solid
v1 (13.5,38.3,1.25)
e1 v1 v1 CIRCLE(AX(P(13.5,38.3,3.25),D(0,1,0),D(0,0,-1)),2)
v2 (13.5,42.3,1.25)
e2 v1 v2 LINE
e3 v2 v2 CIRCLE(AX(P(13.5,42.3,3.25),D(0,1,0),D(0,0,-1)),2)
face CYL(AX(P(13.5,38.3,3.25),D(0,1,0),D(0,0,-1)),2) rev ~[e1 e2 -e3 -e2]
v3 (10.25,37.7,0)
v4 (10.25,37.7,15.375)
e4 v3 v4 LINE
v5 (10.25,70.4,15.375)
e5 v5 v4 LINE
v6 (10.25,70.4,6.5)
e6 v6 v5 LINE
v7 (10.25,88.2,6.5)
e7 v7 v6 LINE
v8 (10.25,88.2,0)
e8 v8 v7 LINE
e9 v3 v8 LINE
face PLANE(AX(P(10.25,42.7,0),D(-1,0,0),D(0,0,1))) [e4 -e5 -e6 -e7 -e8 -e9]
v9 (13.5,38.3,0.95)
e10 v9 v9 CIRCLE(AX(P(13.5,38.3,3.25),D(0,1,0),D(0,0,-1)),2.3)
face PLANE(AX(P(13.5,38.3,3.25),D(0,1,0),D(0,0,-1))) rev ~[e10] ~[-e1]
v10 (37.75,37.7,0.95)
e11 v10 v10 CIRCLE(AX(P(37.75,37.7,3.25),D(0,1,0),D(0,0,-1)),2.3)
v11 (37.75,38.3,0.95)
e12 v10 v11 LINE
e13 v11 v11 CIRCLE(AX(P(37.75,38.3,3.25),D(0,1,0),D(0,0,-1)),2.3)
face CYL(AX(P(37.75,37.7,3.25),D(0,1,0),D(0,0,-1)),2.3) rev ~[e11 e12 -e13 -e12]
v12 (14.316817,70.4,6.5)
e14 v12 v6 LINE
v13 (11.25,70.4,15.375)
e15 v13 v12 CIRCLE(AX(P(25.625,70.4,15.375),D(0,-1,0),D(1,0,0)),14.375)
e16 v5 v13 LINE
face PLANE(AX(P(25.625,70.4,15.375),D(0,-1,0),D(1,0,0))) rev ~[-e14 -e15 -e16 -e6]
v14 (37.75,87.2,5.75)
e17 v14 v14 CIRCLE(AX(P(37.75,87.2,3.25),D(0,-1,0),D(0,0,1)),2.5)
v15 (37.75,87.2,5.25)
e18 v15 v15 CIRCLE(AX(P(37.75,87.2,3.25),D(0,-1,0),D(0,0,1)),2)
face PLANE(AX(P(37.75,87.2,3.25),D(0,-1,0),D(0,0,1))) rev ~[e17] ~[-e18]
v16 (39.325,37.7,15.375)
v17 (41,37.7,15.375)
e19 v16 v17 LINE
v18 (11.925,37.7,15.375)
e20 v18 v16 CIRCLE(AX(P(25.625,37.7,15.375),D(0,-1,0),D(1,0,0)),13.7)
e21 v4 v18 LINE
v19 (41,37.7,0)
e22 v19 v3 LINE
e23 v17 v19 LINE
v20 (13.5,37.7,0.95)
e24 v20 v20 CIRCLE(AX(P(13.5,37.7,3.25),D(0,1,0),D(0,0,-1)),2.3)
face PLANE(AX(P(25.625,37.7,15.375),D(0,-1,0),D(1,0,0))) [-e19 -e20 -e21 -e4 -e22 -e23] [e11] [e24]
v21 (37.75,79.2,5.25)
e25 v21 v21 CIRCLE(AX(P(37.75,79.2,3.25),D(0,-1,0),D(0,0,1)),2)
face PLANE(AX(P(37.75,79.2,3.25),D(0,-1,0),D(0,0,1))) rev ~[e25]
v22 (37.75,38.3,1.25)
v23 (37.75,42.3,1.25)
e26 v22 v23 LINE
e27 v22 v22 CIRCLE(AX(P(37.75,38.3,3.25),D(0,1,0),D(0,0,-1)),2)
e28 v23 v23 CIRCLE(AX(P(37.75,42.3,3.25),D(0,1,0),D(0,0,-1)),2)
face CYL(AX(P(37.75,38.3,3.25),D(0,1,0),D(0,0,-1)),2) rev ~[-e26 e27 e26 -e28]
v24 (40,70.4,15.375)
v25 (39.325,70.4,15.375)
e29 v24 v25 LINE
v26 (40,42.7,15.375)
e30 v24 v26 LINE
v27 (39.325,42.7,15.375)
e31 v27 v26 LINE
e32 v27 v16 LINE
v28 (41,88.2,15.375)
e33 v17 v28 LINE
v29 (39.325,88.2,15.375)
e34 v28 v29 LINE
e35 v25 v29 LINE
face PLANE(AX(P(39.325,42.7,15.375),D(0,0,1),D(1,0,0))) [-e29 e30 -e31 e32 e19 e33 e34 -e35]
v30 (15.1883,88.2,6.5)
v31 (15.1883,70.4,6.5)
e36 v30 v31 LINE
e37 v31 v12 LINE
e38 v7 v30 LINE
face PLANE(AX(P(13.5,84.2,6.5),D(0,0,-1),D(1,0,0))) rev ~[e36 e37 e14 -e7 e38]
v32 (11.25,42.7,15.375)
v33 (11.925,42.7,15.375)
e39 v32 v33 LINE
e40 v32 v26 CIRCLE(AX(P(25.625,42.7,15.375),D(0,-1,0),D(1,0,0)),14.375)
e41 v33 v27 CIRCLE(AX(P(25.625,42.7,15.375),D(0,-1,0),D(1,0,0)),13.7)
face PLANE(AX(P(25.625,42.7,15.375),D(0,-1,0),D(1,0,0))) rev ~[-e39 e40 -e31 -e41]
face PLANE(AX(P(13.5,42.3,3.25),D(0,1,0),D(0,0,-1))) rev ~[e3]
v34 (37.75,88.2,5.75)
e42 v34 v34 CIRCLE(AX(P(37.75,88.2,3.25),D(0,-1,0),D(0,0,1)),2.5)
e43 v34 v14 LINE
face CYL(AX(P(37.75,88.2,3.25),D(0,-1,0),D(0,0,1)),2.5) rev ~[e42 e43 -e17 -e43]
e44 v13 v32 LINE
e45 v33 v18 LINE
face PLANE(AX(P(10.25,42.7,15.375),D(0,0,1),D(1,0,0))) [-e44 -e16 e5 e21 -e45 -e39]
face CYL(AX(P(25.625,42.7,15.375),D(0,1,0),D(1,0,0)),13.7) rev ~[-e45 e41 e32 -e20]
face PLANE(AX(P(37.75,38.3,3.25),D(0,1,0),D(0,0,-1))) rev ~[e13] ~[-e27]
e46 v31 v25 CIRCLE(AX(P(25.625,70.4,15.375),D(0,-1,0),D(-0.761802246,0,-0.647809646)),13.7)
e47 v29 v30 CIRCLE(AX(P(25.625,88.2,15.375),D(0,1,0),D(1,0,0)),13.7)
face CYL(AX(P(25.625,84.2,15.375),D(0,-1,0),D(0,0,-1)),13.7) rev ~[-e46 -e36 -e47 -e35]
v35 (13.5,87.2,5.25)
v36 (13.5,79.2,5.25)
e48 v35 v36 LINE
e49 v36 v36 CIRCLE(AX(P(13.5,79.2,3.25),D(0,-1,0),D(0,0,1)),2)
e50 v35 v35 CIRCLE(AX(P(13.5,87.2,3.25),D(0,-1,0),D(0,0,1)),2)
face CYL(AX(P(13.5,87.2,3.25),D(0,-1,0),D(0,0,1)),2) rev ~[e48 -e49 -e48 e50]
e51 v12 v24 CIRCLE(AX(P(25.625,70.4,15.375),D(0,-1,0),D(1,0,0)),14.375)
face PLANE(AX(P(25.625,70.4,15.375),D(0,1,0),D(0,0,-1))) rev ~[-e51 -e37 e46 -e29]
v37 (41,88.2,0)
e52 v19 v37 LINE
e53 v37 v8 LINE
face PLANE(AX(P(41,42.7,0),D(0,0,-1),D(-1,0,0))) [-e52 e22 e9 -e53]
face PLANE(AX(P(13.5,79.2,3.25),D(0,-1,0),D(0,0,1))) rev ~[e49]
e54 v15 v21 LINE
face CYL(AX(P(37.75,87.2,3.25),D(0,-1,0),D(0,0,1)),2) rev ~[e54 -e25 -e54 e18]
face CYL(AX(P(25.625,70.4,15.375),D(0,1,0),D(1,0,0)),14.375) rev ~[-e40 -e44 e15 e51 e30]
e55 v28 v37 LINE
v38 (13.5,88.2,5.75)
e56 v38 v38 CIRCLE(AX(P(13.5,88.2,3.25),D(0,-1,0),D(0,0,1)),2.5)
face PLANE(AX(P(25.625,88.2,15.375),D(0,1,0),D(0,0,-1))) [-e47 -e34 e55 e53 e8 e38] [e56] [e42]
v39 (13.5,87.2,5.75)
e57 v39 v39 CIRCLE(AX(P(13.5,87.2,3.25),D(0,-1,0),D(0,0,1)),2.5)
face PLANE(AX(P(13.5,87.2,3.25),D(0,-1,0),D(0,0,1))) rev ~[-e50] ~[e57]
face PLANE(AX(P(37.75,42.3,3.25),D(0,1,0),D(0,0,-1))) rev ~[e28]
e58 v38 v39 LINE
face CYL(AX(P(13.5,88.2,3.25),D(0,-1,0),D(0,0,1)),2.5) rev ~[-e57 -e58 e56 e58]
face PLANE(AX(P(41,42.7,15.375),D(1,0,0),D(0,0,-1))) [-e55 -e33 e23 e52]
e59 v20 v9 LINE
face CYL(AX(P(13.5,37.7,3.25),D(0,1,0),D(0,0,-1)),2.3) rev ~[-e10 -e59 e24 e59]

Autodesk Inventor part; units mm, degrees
ref_plane "Work Plane1" through (25.625, 84.2, 15.375) normal (0, 1, 0) x (0, 0, -1)
sketch "Sketch1" plane through (25.625, 84.2, 15.375) normal (0, 1, 0) x (0, 0, -1)
  line L0 (11.5, -1.5) -> (11, -1.5) projected
  line L1 (11, -1.5) -> (11, 1.5) projected
  line L2 (11, 1.5) -> (11.5, 1.5) projected
  line L3 (11.5, 1.5) -> (11.5, -1.5) projected
  line L4 (-12, -1.5) -> (-12, 1.5) projected
  line L5 (-12, 1.5) -> (-11.5, 1.5) projected
  line L6 (-11.5, 1.5) -> (-11.5, -1.5) projected
  line L7 (-11.5, -1.5) -> (-12, -1.5) projected
  circle A0 centre (0, 0) radius 5 projected
  circle A1 centre (0, 0) radius 13.7 projected
  line L8 (18.875, -15.375) -> (18.875, 116.625) projected
  line L9 (18.875, 116.625) -> (15.375, 116.625) projected
  line L10 (15.375, -15.375) -> (15.375, 116.625) projected
  line L11 (18.875, -15.375) -> (15.375, -15.375) projected
  line L12 (15.375, -15.375) -> (0, -15.375)
  line L13 (0, -15.375) -> (0, 15.375)
  line L14 (0, 15.375) -> (15.375, 15.375)
  line L15 (15.375, 15.375) -> (15.375, -15.375)
  circle A2 centre (12.125, 12.125) radius 3.25
  circle A3 centre (12.125, -12.125) radius 3.25
  line L16 (8.875, 15.375) -> (8.875, 10.4367)
  point P0 (15.375, 25.625)
  point P1 (0, -13.7)
  dimension "d2" = 15.375
  dimension "d3" = 15.375
  dimension "d4" = 6.5
  dimension "d5" = 6.5
ref_plane "Work Plane2" through (11.25, 70.4, 1) normal (0, 1, 0) x (0, 0, 1)
extrude "Extrusion1" add sketch "Sketch1" along normal blind 4 and the other way blind 13.8 contours A1 L16 A2 L10 A3 L12 L13 | L16 L14 A2 | A2 | A3 L10 L12 | A3 | L14 L10 A2
sketch "Sketch2" plane through (25.625, 70.4, 15.375) normal (0, -1, 0) x (1, 0, 0)
  arc A0 (-3.651, 5.9062) -> (-4.7619, 7.7035) centre (-4.2064, 6.8048) ccw projected
  arc A1 (-3.651, 5.9062) -> (-6.4477, 2.5768) centre (0, 0) ccw projected
  arc A2 (-8.4097, 3.3608) -> (-6.4477, 2.5768) centre (-7.4287, 2.9688) ccw projected
  arc A3 (-4.7619, 7.7035) -> (-8.4097, 3.3608) centre (0, 0) ccw projected
  arc A4 (6.4477, 2.5768) -> (8.4097, 3.3608) centre (7.4287, 2.9688) ccw projected
  arc A5 (6.4477, 2.5768) -> (3.651, 5.9062) centre (0, 0) ccw projected
  arc A6 (4.7619, 7.7035) -> (3.651, 5.9062) centre (4.2064, 6.8048) ccw projected
  arc A7 (8.4097, 3.3608) -> (4.7619, 7.7035) centre (0, 0) ccw projected
  arc A8 (-6.4563, -2.5553) -> (-8.4209, -3.3328) centre (-7.4386, -2.9441) ccw projected
  arc A9 (-6.4563, -2.5553) -> (-3.651, -5.9062) centre (0, 0) ccw projected
  arc A10 (-4.7619, -7.7035) -> (-3.651, -5.9062) centre (-4.2064, -6.8048) ccw projected
  arc A11 (-8.4209, -3.3328) -> (-4.7619, -7.7035) centre (0, 0) ccw projected
  arc A12 (3.651, -5.9062) -> (4.7619, -7.7035) centre (4.2064, -6.8048) ccw projected
  arc A13 (3.651, -5.9062) -> (6.4563, -2.5553) centre (0, 0) ccw projected
  arc A14 (8.4209, -3.3328) -> (6.4563, -2.5553) centre (7.4386, -2.9441) ccw projected
  arc A15 (4.7619, -7.7035) -> (8.4209, -3.3328) centre (0, 0) ccw projected
  circle A16 centre (10.65, 0.0124) radius 1.15 projected
  circle A17 centre (0, 8) radius 1.0564 projected
  circle A18 centre (0, -8) radius 1.0564 projected
  circle A19 centre (0, 0) radius 5 projected
  circle A20 centre (0, 0) radius 13.7 projected
  line L0 (15.375, -18.875) -> (-116.625, -18.875) projected
  line L1 (-116.625, -18.875) -> (-116.625, -15.375) projected
  line L2 (15.375, -15.375) -> (-116.625, -15.375) projected
  line L3 (15.375, -18.875) -> (15.375, -15.375) projected
  line L4 (15.375, -15.375) -> (-15.375, -15.375)
  line L5 (-15.375, -15.375) -> (-15.375, 0)
  line L6 (-15.375, 0) -> (15.375, 0)
  line L7 (15.375, 0) -> (15.375, -15.375)
  circle A21 centre (0, 0) radius 14.375
  point P0 (-25.625, -15.375)
  point P1 (13.7, 0)
  point P2 (-13.7, 0)
  point P3 (-15.375, -15.375)
  point P4 (14.375, 0)
  point P5 (-14.375, 0)
  dimension "d10" = 15.375
  dimension "d11" = 15.375
ref_plane "Work Plane3" through (11.25, 42.7, 1) normal (0, -1, 0) x (1, 0, 0)
extrude "Extrusion2" add sketch "Sketch2" along normal up to surface (27.7 mm away) contours L6 L7 L2 L5 A21
sketch "Sketch3" plane through (25.625, 42.7, 15.375) normal (0, -1, 0) x (1, 0, 0)
  arc A0 (-3.651, 5.9062) -> (-4.7619, 7.7035) centre (-4.2064, 6.8048) ccw projected
  arc A1 (-3.651, 5.9062) -> (-6.4477, 2.5768) centre (0, 0) ccw projected
  arc A2 (-8.4097, 3.3608) -> (-6.4477, 2.5768) centre (-7.4287, 2.9688) ccw projected
  arc A3 (-4.7619, 7.7035) -> (-8.4097, 3.3608) centre (0, 0) ccw projected
  arc A4 (6.4477, 2.5768) -> (8.4097, 3.3608) centre (7.4287, 2.9688) ccw projected
  arc A5 (6.4477, 2.5768) -> (3.651, 5.9062) centre (0, 0) ccw projected
  arc A6 (4.7619, 7.7035) -> (3.651, 5.9062) centre (4.2064, 6.8048) ccw projected
  arc A7 (8.4097, 3.3608) -> (4.7619, 7.7035) centre (0, 0) ccw projected
  arc A8 (-6.4563, -2.5553) -> (-8.4209, -3.3328) centre (-7.4386, -2.9441) ccw projected
  arc A9 (-6.4563, -2.5553) -> (-3.651, -5.9062) centre (0, 0) ccw projected
  arc A10 (-4.7619, -7.7035) -> (-3.651, -5.9062) centre (-4.2064, -6.8048) ccw projected
  arc A11 (-8.4209, -3.3328) -> (-4.7619, -7.7035) centre (0, 0) ccw projected
  arc A12 (3.651, -5.9062) -> (4.7619, -7.7035) centre (4.2064, -6.8048) ccw projected
  arc A13 (3.651, -5.9062) -> (6.4563, -2.5553) centre (0, 0) ccw projected
  arc A14 (8.4209, -3.3328) -> (6.4563, -2.5553) centre (7.4386, -2.9441) ccw projected
  arc A15 (4.7619, -7.7035) -> (8.4209, -3.3328) centre (0, 0) ccw projected
  circle A16 centre (10.65, 0.0124) radius 1.15 projected
  circle A17 centre (0, 8) radius 1.0564 projected
  circle A18 centre (0, -8) radius 1.0564 projected
  circle A19 centre (0, 0) radius 5 projected
  circle A20 centre (0, 0) radius 13.7 projected
  line L0 (15.375, -18.875) -> (-116.625, -18.875) projected
  line L1 (-116.625, -18.875) -> (-116.625, -15.375) projected
  line L2 (15.375, -15.375) -> (-116.625, -15.375) projected
  line L3 (15.375, -18.875) -> (15.375, -15.375) projected
  line L4 (15.375, 0) -> (15.375, -15.375) projected
  line L5 (15.375, -15.375) -> (-15.375, -15.375)
  line L6 (-15.375, -15.375) -> (-15.375, 0)
  line L7 (-15.375, 0) -> (15.375, 0)
  line L8 (15.375, 0) -> (15.375, -15.375)
  point P0 (-25.625, -15.375)
  point P1 (15.375, 0)
  point P2 (13.7, 0)
  point P3 (-13.7, 0)
  point P4 (-15.375, -15.375)
  dimension "d14" = 15.375
  dimension "d15" = 15.375
ref_plane "Work Plane4" through (11.925, 37.7, 1.675) normal (0, -1, 0) x (1, 0, 0)
extrude "Extrusion3" add sketch "Sketch3" along normal up to surface (5 mm away) contours L7 L4 L2 L6 A20
sketch "Sketch4" plane through (25.625, 37.7, 15.375) normal (0, -1, 0) x (1, 0, 0)
  circle A0 centre (-12.125, -12.125) radius 1.8 projected
  circle A1 centre (12.125, -12.125) radius 1.8 projected
  point P0 (-25.625, -15.375)
hole "Hole1" at (13.5, 37.7, 3.25) at (37.75, 37.7, 3.25) direction (0, 1, 0) diameter 4 depth 4.6 counterbore diameter 4.6 counterbore depth 0.6
sketch "Sketch5" plane through (25.625, 88.2, 15.375) normal (0, 1, 0) x (1, 0, 0)
  arc A0 (13.7, 0) -> (-10.4367, 8.875) centre (0, 0) ccw projected
  line L0 (13.7, 0) -> (15.375, 0) projected
  line L1 (15.375, 0) -> (15.375, 15.375) projected
  line L2 (15.375, 15.375) -> (-15.375, 15.375) projected
  line L3 (-15.375, 15.375) -> (-15.375, 8.875) projected
  line L4 (-15.375, 8.875) -> (-10.4367, 8.875) projected
  circle A1 centre (12.125, 12.125) radius 3.25
  circle A2 centre (-12.125, 12.125) radius 3.25
  point P0 (-25.625, 15.375)
  dimension "d25" = 6.5
  dimension "d26" = 6.5
hole "Hole2" at (37.75, 88.2, 3.25) at (13.5, 88.2, 3.25) direction (0, -1, 0) diameter 4 depth 9 counterbore diameter 5 counterbore depth 1
equation "\"d3\" = d2"
equation "\"d11\" = d10"
equation "\"d15\" = d14"
properties part number "motur_holder"
